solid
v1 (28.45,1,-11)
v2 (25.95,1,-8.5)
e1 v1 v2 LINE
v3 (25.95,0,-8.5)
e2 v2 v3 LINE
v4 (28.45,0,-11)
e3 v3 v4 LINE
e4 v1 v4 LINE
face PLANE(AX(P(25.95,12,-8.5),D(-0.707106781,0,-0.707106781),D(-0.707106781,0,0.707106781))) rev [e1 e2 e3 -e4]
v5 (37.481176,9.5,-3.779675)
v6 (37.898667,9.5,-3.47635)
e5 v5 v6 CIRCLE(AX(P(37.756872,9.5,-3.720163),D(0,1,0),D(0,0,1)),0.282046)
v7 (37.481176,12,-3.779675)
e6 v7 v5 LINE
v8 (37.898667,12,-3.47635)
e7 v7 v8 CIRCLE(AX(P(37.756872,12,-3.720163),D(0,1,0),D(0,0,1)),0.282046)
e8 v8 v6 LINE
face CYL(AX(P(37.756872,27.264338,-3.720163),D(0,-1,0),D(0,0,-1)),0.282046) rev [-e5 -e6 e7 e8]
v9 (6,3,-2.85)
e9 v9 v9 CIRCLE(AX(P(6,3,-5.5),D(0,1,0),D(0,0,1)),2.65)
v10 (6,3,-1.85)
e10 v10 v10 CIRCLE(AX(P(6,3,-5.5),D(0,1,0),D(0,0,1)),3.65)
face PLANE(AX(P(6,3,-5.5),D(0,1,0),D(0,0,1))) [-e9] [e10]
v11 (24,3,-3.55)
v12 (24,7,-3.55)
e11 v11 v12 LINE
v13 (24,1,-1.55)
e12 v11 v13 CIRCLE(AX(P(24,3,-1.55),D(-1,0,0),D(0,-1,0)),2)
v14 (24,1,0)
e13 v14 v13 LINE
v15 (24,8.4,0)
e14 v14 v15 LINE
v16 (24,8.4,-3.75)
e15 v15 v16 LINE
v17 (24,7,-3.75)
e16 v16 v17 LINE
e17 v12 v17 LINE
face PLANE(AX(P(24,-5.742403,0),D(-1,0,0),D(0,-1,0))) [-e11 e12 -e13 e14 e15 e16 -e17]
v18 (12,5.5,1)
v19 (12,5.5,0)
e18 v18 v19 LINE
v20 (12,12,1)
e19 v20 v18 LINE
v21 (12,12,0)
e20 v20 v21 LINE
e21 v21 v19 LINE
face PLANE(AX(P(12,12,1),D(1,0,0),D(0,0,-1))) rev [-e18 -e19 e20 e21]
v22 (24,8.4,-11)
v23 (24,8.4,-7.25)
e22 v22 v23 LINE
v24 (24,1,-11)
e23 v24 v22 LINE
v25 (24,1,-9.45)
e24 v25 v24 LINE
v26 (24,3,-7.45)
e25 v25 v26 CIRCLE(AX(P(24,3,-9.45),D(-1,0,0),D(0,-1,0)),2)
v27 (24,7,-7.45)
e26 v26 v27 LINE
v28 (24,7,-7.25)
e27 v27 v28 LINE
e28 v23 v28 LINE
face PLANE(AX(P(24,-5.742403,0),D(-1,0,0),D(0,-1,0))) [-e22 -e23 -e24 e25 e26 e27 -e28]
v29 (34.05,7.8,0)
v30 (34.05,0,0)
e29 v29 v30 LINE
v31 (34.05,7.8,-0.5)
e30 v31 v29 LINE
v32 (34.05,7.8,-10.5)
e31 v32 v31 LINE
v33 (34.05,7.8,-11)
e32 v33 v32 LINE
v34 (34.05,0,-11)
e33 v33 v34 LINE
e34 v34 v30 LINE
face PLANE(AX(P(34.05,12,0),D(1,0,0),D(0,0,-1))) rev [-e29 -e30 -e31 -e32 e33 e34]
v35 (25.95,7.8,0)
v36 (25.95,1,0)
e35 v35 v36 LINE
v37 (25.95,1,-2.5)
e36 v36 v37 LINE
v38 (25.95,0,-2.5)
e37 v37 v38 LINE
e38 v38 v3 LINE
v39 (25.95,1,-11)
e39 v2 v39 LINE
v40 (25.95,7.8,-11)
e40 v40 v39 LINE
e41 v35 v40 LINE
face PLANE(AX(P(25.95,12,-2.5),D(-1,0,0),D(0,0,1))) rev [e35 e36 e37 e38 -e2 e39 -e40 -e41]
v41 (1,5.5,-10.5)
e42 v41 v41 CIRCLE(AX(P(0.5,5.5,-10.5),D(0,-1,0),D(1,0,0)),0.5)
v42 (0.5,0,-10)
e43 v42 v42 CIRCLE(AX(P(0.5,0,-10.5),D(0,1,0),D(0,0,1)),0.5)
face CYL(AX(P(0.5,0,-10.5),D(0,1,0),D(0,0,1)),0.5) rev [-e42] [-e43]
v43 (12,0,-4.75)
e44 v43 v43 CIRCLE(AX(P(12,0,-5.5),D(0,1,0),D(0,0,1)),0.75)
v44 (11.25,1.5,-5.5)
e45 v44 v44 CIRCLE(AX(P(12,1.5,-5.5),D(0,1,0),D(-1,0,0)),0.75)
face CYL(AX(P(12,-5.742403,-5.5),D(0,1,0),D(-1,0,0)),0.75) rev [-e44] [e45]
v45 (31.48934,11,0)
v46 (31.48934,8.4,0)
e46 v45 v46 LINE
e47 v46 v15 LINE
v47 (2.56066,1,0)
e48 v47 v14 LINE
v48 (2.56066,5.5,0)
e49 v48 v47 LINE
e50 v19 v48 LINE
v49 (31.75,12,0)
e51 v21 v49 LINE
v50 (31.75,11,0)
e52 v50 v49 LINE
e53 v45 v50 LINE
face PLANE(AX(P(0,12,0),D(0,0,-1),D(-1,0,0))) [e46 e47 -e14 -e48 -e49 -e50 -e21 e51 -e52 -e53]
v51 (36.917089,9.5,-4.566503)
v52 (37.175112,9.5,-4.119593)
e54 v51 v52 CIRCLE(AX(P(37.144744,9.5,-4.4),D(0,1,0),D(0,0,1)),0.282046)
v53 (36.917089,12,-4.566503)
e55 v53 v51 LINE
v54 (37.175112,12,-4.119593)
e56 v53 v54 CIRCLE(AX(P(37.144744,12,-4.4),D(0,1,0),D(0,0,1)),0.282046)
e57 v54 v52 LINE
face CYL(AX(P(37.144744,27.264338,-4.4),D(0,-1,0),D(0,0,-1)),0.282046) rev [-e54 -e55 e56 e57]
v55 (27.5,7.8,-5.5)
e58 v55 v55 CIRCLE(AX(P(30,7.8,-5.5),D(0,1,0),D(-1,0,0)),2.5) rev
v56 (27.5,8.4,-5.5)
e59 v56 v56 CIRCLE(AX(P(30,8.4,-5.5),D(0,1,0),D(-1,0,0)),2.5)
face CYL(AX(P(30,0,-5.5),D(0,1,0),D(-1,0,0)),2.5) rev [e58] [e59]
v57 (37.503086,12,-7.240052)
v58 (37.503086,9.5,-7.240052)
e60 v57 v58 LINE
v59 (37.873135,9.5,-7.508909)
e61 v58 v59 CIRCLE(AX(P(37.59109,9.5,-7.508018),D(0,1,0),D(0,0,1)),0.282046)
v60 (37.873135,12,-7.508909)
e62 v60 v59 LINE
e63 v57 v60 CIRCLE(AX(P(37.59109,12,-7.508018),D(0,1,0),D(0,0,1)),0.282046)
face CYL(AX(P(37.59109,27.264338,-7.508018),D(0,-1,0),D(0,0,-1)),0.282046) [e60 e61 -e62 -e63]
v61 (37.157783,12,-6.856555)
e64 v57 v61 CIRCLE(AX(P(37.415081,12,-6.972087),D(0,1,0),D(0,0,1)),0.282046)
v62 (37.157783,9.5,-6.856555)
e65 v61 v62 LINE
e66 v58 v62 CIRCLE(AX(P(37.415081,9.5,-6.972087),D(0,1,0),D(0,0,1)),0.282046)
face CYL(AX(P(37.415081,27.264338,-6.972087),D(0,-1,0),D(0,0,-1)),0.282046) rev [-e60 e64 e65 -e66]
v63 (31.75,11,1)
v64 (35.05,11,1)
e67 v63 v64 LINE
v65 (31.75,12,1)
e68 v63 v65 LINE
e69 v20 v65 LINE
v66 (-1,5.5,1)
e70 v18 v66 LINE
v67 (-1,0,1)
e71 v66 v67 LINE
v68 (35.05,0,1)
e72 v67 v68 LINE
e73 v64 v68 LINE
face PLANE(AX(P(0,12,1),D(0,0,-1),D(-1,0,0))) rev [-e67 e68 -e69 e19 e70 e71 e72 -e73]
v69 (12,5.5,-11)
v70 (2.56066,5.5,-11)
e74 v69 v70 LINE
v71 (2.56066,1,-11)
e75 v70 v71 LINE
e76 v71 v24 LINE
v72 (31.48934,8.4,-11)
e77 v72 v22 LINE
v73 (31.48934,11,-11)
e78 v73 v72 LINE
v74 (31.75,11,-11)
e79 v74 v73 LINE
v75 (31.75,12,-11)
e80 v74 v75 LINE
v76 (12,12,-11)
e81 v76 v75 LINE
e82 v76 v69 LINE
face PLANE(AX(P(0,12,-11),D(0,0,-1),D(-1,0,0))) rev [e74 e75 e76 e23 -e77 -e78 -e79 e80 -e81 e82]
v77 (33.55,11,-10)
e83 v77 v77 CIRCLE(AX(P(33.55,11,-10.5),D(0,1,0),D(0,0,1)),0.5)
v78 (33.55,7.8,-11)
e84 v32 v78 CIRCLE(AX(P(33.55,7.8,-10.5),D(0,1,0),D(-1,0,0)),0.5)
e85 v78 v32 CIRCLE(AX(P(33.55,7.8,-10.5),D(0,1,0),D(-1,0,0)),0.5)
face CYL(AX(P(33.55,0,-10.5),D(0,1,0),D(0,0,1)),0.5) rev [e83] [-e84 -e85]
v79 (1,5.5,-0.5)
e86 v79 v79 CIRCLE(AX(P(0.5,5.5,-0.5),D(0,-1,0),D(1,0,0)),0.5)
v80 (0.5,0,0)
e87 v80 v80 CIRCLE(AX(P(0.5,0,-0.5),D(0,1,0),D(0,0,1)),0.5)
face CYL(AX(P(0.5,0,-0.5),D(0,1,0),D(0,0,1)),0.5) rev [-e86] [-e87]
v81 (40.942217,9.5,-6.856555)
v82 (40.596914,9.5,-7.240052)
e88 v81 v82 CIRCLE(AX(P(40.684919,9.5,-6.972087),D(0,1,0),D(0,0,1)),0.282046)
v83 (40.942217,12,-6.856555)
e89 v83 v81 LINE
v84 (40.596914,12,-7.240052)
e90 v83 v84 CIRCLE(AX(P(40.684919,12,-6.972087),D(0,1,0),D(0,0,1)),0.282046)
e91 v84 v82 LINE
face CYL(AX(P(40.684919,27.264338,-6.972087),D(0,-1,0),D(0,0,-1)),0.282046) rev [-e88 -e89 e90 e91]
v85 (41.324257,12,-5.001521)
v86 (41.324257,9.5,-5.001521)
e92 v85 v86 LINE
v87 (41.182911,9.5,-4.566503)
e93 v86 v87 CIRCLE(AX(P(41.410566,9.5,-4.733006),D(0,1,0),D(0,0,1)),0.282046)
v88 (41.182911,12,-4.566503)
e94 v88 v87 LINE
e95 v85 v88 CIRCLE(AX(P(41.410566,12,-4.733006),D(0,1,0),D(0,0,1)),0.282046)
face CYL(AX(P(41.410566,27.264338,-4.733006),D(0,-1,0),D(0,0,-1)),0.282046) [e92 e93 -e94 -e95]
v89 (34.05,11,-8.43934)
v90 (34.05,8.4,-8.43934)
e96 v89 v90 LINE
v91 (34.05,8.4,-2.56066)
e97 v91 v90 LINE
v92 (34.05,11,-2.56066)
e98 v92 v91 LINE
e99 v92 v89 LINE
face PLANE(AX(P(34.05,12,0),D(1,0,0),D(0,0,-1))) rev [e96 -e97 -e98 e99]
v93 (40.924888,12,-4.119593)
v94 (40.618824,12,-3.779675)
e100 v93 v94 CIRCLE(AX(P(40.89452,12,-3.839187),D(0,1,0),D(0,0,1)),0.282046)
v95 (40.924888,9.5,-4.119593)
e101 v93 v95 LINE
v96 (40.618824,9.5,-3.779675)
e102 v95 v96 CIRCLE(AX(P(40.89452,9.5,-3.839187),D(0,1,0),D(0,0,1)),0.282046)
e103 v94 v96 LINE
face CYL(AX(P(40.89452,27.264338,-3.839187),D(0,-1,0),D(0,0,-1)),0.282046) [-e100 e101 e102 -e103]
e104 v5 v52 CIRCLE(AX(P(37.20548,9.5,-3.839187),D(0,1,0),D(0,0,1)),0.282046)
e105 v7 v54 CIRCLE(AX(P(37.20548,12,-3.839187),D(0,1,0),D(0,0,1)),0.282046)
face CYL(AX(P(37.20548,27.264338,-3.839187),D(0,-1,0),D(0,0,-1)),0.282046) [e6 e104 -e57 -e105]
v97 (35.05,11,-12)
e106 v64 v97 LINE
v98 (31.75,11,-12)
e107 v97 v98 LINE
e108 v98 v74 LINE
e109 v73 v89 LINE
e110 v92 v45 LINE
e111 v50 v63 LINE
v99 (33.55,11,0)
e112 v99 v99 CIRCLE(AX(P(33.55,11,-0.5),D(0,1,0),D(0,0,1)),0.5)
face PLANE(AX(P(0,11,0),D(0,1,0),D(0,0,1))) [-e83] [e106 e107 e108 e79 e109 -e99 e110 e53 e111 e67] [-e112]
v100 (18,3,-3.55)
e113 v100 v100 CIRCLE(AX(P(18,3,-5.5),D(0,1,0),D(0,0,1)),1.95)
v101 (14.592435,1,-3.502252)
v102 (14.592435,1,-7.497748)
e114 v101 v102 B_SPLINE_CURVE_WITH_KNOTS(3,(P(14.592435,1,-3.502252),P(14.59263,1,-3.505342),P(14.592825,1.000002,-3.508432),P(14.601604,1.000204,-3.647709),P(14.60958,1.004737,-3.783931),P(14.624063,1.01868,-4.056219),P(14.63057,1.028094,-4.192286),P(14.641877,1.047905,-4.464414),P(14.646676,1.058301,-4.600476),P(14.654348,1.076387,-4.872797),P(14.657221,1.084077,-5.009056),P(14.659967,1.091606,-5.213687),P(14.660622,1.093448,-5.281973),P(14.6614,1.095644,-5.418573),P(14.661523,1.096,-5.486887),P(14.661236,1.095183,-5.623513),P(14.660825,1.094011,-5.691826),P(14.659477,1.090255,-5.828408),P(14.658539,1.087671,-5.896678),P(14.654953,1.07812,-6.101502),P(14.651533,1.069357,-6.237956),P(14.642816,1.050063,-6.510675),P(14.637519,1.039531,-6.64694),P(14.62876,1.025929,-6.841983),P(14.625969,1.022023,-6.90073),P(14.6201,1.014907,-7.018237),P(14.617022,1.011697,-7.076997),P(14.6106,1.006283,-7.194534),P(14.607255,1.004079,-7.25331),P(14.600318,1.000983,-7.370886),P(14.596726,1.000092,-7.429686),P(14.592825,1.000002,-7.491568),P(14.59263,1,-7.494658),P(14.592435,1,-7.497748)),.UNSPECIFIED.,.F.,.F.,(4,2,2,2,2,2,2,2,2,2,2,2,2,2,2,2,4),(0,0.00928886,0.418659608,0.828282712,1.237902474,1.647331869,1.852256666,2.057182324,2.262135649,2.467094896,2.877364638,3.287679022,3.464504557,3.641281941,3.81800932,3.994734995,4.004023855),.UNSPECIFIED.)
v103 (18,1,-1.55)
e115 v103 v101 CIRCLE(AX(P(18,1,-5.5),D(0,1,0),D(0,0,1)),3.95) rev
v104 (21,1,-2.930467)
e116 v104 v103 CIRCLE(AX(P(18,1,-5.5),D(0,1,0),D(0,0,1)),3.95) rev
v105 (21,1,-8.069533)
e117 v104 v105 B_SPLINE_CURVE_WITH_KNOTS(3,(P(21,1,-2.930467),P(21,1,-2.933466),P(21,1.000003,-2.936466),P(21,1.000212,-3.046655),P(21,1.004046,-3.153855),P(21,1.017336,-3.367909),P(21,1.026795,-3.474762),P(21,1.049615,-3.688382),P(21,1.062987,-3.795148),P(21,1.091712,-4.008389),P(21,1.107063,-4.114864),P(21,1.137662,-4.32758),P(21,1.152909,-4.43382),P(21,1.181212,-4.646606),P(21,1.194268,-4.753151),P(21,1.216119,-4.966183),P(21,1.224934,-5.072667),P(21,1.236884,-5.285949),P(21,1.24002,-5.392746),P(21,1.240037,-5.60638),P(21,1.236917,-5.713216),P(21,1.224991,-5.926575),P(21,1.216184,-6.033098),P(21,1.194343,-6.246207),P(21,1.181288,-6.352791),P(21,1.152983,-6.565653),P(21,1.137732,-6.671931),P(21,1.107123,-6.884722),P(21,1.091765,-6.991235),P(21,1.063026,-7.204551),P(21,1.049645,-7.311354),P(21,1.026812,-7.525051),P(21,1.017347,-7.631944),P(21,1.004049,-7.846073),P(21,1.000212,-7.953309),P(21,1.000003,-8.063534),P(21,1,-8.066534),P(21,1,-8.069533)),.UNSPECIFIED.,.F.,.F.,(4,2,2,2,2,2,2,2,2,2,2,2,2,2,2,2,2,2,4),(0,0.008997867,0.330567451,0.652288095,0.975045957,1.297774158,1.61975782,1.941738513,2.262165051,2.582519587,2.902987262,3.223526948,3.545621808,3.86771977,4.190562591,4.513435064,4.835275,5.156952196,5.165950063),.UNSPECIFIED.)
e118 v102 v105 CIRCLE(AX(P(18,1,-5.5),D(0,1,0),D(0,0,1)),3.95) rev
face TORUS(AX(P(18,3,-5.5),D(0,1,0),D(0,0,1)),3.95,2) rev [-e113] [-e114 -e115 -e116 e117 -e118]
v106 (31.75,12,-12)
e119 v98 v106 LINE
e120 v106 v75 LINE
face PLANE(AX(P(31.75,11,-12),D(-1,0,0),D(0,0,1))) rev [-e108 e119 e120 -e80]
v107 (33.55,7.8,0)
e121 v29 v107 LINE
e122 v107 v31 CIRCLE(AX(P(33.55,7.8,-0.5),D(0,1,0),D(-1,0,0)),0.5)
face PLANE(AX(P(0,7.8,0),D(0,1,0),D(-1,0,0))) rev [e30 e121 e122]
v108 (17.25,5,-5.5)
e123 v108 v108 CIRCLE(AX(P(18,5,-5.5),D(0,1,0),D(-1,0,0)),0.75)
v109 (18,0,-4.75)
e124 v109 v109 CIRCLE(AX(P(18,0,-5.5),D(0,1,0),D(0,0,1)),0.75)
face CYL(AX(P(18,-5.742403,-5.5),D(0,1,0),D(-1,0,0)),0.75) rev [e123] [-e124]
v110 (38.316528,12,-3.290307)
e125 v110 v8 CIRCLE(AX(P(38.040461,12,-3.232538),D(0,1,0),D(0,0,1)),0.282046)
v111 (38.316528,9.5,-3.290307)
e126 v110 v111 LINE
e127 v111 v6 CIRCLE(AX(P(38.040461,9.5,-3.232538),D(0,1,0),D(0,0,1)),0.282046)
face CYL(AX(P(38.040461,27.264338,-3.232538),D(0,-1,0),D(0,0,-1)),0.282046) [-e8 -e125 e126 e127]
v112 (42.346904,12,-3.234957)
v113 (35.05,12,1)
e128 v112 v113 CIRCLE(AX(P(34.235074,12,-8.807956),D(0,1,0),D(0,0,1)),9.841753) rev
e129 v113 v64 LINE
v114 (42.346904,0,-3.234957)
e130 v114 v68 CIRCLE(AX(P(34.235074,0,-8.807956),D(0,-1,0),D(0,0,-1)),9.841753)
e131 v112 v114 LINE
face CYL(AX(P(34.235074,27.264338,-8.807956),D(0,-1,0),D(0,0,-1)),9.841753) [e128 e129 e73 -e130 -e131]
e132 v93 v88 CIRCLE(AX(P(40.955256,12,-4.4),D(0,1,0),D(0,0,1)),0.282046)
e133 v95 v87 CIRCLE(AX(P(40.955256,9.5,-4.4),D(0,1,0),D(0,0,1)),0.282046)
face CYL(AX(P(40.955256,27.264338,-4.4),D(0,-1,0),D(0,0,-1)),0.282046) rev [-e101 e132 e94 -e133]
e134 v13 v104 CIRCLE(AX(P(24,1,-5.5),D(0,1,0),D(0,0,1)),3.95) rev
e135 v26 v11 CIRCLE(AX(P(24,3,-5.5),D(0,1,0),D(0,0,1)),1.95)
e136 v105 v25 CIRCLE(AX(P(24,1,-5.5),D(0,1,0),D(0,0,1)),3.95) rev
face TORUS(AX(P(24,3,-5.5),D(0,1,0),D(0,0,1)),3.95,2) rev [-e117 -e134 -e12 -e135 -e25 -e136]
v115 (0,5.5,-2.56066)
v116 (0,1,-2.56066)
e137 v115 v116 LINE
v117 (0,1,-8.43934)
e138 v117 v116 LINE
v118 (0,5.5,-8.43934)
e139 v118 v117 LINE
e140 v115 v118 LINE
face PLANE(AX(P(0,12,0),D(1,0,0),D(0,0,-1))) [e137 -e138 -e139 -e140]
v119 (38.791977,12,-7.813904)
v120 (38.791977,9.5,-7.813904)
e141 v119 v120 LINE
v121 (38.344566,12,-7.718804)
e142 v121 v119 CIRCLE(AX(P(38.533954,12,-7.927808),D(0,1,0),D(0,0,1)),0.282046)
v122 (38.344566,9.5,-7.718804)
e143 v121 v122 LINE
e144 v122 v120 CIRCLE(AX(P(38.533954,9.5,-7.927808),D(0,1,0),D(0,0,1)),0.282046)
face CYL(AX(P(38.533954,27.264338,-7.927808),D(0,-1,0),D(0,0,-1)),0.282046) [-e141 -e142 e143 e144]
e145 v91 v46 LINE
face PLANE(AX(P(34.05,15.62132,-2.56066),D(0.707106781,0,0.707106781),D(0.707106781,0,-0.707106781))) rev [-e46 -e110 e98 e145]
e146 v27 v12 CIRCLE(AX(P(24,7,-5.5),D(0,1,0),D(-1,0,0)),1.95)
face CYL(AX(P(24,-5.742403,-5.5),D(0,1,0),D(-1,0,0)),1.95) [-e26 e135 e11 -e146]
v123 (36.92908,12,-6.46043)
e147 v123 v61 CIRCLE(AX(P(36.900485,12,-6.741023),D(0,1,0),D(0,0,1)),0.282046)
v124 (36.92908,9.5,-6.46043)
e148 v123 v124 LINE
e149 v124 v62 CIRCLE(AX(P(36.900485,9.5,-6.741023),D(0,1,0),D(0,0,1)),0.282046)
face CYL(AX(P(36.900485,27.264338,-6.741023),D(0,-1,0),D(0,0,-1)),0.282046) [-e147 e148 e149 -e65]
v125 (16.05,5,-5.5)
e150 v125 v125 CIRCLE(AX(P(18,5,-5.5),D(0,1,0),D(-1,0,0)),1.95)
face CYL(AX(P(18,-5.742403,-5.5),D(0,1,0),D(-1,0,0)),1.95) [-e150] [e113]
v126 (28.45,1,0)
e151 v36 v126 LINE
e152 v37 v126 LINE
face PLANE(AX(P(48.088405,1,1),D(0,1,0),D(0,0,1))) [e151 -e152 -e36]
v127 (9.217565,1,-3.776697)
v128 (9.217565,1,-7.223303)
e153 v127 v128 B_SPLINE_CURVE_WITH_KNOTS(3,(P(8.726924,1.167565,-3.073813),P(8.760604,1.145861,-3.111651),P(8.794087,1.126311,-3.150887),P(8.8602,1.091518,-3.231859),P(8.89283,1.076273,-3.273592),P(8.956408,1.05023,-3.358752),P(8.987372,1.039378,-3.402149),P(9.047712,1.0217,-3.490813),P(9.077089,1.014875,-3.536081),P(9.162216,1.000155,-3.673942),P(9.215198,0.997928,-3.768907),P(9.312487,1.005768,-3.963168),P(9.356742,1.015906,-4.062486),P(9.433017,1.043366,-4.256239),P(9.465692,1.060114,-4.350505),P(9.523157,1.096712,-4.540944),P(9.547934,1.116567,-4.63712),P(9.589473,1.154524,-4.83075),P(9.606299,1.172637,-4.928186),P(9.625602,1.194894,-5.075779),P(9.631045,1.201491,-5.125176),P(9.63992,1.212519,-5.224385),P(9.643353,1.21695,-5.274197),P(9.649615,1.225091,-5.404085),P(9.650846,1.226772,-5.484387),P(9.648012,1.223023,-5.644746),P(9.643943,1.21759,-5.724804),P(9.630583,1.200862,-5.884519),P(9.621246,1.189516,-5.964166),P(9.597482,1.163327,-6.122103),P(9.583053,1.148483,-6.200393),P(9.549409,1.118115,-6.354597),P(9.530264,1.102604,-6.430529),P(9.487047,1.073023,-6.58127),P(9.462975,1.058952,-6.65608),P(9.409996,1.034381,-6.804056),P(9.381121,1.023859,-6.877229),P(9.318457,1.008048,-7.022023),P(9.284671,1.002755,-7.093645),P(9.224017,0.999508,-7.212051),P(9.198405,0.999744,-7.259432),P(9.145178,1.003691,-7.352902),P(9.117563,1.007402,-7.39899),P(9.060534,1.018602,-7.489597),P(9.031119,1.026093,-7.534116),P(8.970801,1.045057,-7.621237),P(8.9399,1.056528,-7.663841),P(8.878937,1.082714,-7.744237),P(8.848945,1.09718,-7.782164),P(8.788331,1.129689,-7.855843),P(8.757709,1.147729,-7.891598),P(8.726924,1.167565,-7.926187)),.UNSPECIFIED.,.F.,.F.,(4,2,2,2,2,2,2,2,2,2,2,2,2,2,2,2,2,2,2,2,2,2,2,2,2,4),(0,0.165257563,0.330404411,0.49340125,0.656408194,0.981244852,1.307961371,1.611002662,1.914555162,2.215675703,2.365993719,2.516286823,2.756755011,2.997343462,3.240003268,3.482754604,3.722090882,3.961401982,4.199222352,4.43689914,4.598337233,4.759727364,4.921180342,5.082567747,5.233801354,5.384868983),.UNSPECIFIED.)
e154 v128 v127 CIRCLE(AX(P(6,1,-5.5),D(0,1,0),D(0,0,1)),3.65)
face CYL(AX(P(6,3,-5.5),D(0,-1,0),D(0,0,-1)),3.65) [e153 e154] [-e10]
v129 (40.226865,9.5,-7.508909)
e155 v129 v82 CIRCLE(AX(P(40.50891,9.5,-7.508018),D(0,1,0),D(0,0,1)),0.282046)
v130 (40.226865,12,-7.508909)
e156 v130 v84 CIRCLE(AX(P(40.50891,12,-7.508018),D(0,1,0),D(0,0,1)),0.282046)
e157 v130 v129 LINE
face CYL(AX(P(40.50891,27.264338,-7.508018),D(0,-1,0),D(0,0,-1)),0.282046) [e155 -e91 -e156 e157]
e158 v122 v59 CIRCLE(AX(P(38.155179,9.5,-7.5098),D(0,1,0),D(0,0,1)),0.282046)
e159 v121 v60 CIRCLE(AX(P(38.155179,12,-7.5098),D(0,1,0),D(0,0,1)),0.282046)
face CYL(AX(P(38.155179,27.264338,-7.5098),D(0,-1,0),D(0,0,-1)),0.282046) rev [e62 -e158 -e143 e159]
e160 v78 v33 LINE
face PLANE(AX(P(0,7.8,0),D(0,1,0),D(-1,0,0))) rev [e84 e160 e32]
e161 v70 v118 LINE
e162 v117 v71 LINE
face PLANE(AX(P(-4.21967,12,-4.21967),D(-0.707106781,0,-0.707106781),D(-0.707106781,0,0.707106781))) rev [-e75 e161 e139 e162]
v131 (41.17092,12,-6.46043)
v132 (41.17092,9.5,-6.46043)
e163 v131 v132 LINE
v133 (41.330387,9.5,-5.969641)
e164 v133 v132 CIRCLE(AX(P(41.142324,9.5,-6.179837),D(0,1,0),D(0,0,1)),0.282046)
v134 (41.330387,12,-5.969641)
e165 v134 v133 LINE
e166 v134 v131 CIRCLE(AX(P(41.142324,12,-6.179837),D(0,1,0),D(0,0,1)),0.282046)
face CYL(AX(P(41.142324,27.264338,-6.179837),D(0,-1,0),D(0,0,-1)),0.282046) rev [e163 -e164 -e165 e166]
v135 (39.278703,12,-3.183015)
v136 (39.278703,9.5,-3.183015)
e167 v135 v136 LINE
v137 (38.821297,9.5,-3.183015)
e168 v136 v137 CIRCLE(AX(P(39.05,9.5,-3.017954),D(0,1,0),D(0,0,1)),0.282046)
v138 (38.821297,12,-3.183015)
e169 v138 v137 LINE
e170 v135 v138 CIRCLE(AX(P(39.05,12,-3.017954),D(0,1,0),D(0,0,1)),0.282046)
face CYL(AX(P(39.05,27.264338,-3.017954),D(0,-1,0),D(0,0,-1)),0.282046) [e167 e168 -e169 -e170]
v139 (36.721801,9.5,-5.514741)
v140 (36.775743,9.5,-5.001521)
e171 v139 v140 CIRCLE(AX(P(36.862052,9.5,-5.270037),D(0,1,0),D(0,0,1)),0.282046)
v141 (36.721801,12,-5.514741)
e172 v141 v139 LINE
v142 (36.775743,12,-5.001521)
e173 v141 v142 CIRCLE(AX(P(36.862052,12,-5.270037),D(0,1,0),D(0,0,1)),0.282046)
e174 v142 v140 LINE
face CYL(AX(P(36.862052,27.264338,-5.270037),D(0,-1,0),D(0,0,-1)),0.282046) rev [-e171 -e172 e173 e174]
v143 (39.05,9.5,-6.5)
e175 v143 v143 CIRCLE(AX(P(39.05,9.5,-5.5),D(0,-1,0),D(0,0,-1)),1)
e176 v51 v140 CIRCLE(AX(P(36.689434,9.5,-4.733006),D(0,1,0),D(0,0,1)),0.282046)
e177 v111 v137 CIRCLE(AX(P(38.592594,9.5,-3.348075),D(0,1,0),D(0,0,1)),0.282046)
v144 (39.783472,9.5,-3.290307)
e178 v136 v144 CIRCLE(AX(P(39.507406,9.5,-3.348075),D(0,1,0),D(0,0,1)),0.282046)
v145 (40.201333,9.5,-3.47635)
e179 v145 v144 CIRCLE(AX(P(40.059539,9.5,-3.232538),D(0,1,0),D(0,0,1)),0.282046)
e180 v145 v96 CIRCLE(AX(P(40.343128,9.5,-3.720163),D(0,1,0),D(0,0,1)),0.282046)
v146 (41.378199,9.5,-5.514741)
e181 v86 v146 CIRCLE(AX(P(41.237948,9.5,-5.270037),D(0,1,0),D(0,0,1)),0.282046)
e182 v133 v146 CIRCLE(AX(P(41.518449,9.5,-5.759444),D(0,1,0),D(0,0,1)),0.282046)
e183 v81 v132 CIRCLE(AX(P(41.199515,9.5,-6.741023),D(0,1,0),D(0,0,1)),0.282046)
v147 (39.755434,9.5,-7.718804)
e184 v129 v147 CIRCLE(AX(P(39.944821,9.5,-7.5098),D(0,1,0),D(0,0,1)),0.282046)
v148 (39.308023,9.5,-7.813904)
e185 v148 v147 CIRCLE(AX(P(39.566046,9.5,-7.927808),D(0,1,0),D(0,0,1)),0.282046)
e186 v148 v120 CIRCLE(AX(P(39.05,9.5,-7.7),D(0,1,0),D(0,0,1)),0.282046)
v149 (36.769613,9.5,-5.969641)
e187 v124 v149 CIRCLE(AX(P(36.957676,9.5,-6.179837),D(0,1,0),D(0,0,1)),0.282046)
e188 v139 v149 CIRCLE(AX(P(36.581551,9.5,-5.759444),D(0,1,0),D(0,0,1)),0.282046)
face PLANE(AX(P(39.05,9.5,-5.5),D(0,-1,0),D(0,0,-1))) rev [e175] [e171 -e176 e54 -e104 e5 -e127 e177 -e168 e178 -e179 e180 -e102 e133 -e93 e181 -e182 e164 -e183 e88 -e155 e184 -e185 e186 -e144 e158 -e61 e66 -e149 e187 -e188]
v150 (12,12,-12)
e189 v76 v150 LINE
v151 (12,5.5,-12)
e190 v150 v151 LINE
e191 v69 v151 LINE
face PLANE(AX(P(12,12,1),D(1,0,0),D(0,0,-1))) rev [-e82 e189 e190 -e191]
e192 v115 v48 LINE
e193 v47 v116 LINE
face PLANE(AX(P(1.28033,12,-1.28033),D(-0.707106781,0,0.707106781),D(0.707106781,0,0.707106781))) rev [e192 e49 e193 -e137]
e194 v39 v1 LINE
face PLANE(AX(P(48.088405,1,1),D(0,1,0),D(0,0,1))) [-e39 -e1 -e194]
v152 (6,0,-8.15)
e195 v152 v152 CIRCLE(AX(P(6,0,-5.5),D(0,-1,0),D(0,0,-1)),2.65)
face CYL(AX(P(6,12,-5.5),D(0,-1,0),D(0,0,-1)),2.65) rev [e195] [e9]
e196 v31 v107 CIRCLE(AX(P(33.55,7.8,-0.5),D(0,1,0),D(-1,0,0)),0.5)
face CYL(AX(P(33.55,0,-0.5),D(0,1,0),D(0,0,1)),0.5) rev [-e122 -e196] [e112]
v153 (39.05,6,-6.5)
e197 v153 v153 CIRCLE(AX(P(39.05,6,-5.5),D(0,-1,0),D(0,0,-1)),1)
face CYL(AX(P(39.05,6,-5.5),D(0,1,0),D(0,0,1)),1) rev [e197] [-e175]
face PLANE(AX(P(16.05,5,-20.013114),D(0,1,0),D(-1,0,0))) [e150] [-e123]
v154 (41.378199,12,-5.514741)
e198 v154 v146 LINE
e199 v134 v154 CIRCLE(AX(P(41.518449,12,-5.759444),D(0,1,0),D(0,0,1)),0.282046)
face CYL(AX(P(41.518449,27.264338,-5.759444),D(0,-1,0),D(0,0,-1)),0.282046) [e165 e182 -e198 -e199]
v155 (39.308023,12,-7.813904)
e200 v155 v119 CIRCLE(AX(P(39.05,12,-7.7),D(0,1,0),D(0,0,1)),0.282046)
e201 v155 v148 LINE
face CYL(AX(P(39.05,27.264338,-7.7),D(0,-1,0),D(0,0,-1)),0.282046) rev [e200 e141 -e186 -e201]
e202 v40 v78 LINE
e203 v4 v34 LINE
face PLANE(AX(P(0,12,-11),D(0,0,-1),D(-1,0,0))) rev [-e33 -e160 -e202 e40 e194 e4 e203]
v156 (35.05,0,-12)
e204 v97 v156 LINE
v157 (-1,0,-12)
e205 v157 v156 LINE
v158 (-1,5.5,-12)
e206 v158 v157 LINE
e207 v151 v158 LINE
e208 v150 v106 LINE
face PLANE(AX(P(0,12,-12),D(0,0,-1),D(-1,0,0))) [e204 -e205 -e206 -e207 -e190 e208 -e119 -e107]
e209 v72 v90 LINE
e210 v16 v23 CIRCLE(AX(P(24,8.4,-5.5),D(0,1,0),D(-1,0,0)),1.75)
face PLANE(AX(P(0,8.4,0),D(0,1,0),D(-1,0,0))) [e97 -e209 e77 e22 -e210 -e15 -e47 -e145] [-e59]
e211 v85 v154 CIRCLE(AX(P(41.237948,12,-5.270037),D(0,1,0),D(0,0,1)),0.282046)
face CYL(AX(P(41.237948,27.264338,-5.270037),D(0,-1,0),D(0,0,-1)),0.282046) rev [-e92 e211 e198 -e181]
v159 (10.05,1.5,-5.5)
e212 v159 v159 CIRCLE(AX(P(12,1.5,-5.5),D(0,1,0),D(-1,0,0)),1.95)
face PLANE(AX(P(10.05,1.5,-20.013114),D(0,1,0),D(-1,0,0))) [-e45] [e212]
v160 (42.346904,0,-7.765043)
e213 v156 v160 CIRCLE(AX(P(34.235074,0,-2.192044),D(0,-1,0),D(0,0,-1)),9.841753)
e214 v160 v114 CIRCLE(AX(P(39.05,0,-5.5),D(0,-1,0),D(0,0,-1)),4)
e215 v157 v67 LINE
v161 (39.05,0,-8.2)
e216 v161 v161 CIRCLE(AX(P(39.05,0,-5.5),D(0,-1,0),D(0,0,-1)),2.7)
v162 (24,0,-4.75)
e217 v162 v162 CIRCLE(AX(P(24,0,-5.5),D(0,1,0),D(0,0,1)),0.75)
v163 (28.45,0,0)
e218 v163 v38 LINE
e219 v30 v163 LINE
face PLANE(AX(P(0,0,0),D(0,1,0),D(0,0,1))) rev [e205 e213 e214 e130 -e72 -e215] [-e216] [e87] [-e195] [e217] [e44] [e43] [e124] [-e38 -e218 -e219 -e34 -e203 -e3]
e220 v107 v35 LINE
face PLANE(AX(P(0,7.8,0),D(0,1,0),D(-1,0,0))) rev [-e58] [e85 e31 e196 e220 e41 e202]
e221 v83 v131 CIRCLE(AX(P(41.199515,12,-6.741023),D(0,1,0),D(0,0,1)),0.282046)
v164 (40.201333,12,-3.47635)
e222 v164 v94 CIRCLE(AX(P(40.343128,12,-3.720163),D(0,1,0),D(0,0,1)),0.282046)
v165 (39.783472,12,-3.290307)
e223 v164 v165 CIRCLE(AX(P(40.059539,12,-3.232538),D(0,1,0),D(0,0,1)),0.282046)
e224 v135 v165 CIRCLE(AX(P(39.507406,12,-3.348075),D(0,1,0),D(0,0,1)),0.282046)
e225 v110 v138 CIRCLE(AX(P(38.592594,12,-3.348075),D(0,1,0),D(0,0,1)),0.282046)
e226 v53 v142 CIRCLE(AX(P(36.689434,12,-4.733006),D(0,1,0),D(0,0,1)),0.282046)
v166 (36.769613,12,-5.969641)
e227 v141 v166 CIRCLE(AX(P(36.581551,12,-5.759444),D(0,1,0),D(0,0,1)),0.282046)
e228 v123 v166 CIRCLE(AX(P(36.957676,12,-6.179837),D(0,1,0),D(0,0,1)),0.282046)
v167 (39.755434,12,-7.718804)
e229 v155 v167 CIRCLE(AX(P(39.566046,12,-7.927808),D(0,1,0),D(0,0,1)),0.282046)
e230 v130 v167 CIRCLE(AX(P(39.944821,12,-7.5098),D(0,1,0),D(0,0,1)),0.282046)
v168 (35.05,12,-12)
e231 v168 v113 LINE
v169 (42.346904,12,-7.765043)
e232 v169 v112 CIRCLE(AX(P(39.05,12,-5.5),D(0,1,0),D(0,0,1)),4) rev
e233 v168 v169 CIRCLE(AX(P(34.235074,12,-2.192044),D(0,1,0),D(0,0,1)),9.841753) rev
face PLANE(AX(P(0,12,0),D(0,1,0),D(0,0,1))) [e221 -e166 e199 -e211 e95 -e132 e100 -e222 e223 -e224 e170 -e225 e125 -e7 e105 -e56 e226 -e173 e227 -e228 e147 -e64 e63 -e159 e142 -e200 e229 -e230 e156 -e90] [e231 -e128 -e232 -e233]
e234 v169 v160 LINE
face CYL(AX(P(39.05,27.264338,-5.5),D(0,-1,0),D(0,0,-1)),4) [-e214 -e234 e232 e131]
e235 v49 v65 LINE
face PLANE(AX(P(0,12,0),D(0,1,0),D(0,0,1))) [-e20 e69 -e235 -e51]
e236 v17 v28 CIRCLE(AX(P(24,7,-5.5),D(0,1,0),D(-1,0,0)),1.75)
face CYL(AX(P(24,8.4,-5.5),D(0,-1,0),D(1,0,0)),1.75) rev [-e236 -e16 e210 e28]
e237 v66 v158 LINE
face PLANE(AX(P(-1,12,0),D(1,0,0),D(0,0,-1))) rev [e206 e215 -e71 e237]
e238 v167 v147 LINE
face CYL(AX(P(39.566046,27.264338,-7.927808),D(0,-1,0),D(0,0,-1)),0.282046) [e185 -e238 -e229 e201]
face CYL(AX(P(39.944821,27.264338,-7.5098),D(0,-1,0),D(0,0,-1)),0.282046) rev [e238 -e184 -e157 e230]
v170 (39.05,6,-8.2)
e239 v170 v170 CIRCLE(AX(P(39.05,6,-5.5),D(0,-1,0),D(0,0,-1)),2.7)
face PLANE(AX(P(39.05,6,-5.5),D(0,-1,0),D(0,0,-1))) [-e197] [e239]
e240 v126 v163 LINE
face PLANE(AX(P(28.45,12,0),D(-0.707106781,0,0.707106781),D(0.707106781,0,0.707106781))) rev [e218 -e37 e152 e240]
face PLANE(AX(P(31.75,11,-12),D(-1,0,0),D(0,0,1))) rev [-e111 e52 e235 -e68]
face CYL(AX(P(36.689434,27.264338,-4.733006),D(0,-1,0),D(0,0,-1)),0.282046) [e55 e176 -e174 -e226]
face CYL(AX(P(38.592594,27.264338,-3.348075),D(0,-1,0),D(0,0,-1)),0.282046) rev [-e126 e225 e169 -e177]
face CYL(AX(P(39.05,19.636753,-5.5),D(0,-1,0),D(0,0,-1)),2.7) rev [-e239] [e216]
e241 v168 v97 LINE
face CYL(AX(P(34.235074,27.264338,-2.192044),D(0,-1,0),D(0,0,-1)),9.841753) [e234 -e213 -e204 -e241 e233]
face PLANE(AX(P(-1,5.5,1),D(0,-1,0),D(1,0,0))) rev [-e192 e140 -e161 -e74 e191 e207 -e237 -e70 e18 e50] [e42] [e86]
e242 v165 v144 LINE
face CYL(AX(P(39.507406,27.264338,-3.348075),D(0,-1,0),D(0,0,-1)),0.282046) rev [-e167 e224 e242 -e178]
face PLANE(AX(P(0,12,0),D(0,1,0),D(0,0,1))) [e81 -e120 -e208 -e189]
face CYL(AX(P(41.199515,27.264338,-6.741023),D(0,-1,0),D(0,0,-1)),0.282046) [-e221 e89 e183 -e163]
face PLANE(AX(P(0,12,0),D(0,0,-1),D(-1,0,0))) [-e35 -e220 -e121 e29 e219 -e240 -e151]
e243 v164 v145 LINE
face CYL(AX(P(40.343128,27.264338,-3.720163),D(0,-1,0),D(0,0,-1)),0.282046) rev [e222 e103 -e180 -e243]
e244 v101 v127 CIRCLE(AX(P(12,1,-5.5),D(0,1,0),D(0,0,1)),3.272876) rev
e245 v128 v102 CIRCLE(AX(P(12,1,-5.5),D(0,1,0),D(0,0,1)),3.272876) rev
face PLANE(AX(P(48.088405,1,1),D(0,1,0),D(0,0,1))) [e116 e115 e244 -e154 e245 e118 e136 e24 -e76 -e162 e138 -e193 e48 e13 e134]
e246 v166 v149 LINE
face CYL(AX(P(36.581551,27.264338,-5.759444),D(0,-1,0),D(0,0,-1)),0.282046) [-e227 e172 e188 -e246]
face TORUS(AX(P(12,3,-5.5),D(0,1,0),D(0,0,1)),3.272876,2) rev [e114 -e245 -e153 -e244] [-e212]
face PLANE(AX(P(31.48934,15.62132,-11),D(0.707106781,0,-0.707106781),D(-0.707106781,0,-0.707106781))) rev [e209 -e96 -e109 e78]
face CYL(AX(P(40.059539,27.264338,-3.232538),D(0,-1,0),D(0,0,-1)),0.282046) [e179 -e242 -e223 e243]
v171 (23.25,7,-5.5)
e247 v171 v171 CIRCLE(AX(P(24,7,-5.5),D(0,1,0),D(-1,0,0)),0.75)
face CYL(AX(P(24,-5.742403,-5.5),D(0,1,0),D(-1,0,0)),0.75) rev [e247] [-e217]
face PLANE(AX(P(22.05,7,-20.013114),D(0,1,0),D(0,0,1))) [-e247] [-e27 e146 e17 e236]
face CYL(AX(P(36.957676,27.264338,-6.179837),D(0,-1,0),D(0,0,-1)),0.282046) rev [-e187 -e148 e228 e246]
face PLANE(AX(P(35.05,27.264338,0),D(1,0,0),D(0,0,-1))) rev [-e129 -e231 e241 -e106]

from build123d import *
from build123d.topology import SkipClean

# Parameters (mm, degrees)
ESQUISSE2_W                 = 36.05
ESQUISSE2_H                 = 13
ESQUISSE2_W_2               = 34.05
ESQUISSE2_H_2               = 11
BOSS_EXTRU_1_DEPTH          = 12
ESQUISSE3_W                 = 13
ESQUISSE3_H                 = 1
BOSS_EXTRU_2_DEPTH          = 36.05
ESQUISSE4_R                 = 2.65
ENL_V_MAT_EXTRU_1_DEPTH     = 12
ESQUISSE6_W                 = 3.9
ESQUISSE6_H                 = 1.5
ESQUISSE6_H_2               = 5
ESQUISSE6_H_3               = 7
BOSS_EXTRU_3_DEPTH          = 13
ENL_V_START                 = -6
ENL_V_MAT_EXTRU_2_OUTLINE_R = 0.75
ENL_V_MAT_EXTRU_2_DEPTH     = 6
ESQUISSE8_W                 = 13
ESQUISSE8_H                 = 6.5
ENL_V_MAT_EXTRU_3_DEPTH     = 40.261972696
ESQUISSE9_W                 = 8.1
ESQUISSE9_H                 = 11
BOSS_EXTRU_5_DEPTH          = 1.4
ESQUISSE11_R                = 2.5
ENL_V_MAT_EXTRU_4_DEPTH     = 38.987662471
CONG_2_R                    = 2
ESQUISSE10_W                = 8.1
ESQUISSE10_H                = 11
ENL_V_MAT_EXTRU_5_DEPTH     = 0.8
BOSS_EXTRU_6_DEPTH          = 2.6
ESQUISSE14_R                = 0.5
ENL_V_MAT_EXTRU_7_DEPTH     = 39.645860063
ESQUISSE15_R                = 0.75
ENL_V_MAT_EXTRU_8_DEPTH     = 38.702818197
ESQUISSE16_W                = 3.3
ESQUISSE16_H                = 13
ENL_V_MAT_EXTRU_9_DEPTH     = 1
ESQUISSE18_R                = 3.65
ESQUISSE18_R_2              = 2.65
BOSS_EXTRU_7_DEPTH          = 2
BOSS_EXTRU_8_REACH          = 40.942
ESQUISSE21_R                = 2.7
ENL_V_MAT_EXTRU_10_DEPTH    = 9.5
BOSS_EXTRU_9_START          = 3.5
ESQUISSE22_R                = 2.7
ESQUISSE22_R_2              = 1
BOSS_EXTRU_9_DEPTH          = 3.5


# Read off the part's stored shape, not the designer's step: Enlèv. mat.-Extru.2
with BuildPart() as part:
    # Esquisse2 → Boss.-Extru.1 (new body)
    # profile 1 of 3: a face of its own
    with BuildSketch(Plane(origin=(0, 0, 0), x_dir=(1, 0, 0), z_dir=(0, 1, 0))):
        with Locations((17.025, 5.5)):
            Rectangle(ESQUISSE2_W, ESQUISSE2_H)
        with Locations((17.025, 5.5)):
            Rectangle(ESQUISSE2_W_2, ESQUISSE2_H_2, mode=Mode.SUBTRACT)
    # profile 2 of 3: a face of its own
    with BuildSketch(Plane(origin=(0, 0, 0), x_dir=(1, 0, 0), z_dir=(0, 1, 0))):
        Polygon((0, 0), (2.560660172, 0), (0, 2.560660172), align=None)
    # profile 3 of 3: a face of its own
    with BuildSketch(Plane(origin=(0, 0, 0), x_dir=(1, 0, 0), z_dir=(0, 1, 0))):
        Polygon((0, 11), (0, 8.439339828), (2.560660172, 11), align=None)
    extrude(amount=BOSS_EXTRU_1_DEPTH)

    # Esquisse3 → Boss.-Extru.2 (add)
    with BuildSketch(Plane.ZY.offset(1)):
        with Locations((-5.5, 0.5)):
            Rectangle(ESQUISSE3_W, ESQUISSE3_H)
    extrude(amount=-BOSS_EXTRU_2_DEPTH)

    # Esquisse4 → Enlèv. mat.-Extru.1 (cut)
    with BuildSketch(Plane.XZ):
        with Locations(Location((6, -5.5, 0), (0, 0, 270))):
            Circle(ESQUISSE4_R)
        Polygon((34.05, 0), (28.45, 0), (25.95, -2.5), (25.95, -8.5), (28.45, -11), (34.05, -11), align=None)
    extrude(amount=-ENL_V_MAT_EXTRU_1_DEPTH, mode=Mode.SUBTRACT)

    # Esquisse6 → Boss.-Extru.3 (add)
    with BuildSketch(Plane.XY.offset(1)):
        with Locations((12, 0.75)):
            Rectangle(ESQUISSE6_W, ESQUISSE6_H)
        with Locations((18, 2.5)):
            Rectangle(ESQUISSE6_W, ESQUISSE6_H_2)
        with Locations((24, 3.5)):
            Rectangle(ESQUISSE6_W, ESQUISSE6_H_3)
    extrude(amount=-BOSS_EXTRU_3_DEPTH)

    # Enlèv. mat.-Extru.2 outline → Enlèv. mat.-Extru.2 (cut)
    with BuildSketch(Plane(origin=(0, 7, 0), x_dir=(1, 0, 0), z_dir=(0, 1, 0)).offset(ENL_V_START)):
        with BuildLine():
            Line((24, 7.45), (24, 11))
            Line((24, 11), (22.05, 11))
            Line((22.05, 11), (22.05, 5.5))
            ThreePointArc((22.05, 5.5), (22.621141777, 6.878858223), (24, 7.45))
        make_face()
        with BuildLine():
            Line((19.95, 5.5), (19.95, 11))
            Line((19.95, 11), (16.05, 11))
            Line((16.05, 11), (16.05, 5.5))
            ThreePointArc((16.05, 5.5), (18, 7.45), (19.95, 5.5))
        make_face()
        with BuildLine():
            ThreePointArc((24, 3.55), (22.621141777, 4.121141777), (22.05, 5.5))
            Line((22.05, 5.5), (22.05, 0))
            Line((22.05, 0), (24, 0))
            Line((24, 0), (24, 3.55))
        make_face()
        with BuildLine():
            Line((19.95, 0), (19.95, 5.5))
            ThreePointArc((19.95, 5.5), (18, 3.55), (16.05, 5.5))
            Line((16.05, 5.5), (16.05, 0))
            Line((16.05, 0), (19.95, 0))
        make_face()
        with BuildLine():
            Line((13.95, 5.5), (13.95, 11))
            Line((13.95, 11), (10.05, 11))
            Line((10.05, 11), (10.05, 5.5))
            ThreePointArc((10.05, 5.5), (12, 7.45), (13.95, 5.5))
        make_face()
        with BuildLine():
            Line((13.95, 0), (13.95, 5.5))
            ThreePointArc((13.95, 5.5), (12, 3.55), (10.05, 5.5))
            Line((10.05, 5.5), (10.05, 0))
            Line((10.05, 0), (13.95, 0))
        make_face()
        with Locations((24, 5.5)):
            Circle(ENL_V_MAT_EXTRU_2_OUTLINE_R)
        with Locations((18, 5.5)):
            Circle(ENL_V_MAT_EXTRU_2_OUTLINE_R)
        with Locations((12, 5.5)):
            Circle(ENL_V_MAT_EXTRU_2_OUTLINE_R)
    extrude(amount=ENL_V_MAT_EXTRU_2_DEPTH, mode=Mode.SUBTRACT)

    # Esquisse8 → Enlèv. mat.-Extru.3 (cut, through all)
    with BuildSketch(Plane(origin=(0, 0, -12), x_dir=(-1, 0, 0), z_dir=(0, 0, -1))):
        with Locations((-5.5, 8.75)):
            Rectangle(ESQUISSE8_W, ESQUISSE8_H)
    extrude(amount=-ENL_V_MAT_EXTRU_3_DEPTH, mode=Mode.SUBTRACT)

    # Esquisse9 → Boss.-Extru.5 (add)
    with BuildSketch(Plane(origin=(0, 7, 0), x_dir=(1, 0, 0), z_dir=(0, 1, 0))):
        with Locations((30, 5.5)):
            Rectangle(ESQUISSE9_W, ESQUISSE9_H)
        with BuildLine():
            Line((24, 0), (25.95, 0))
            Line((25.95, 0), (25.95, 11))
            Line((25.95, 11), (24, 11))
            Line((24, 11), (24, 7.45))
            Line((24, 7.45), (24, 7.25))
            ThreePointArc((24, 7.25), (25.237436867, 6.737436867), (25.75, 5.5))
            ThreePointArc((25.75, 5.5), (25.237436867, 4.262563133), (24, 3.75))
            Line((24, 3.75), (24, 3.55))
            Line((24, 3.55), (24, 0))
        make_face()
    extrude(amount=BOSS_EXTRU_5_DEPTH)

    # Esquisse11 → Enlèv. mat.-Extru.4 (cut, through all)
    with BuildSketch(Plane(origin=(0, 8.4, 0), x_dir=(1, 0, 0), z_dir=(0, 1, 0))):
        with Locations(Location((30, 5.5, 0), (0, 0, 180))):
            Circle(ESQUISSE11_R)
    extrude(amount=-ENL_V_MAT_EXTRU_4_DEPTH, mode=Mode.SUBTRACT)

    # Congé2
    # the kernel refuses this fillet: 2 mm, written as the material it adds along each edge
    with BuildSketch(Plane(origin=(12, 1, -5.5), x_dir=(-1, 0, 0), z_dir=(0, 0, 1))) as cong_2_piece_1:
        with BuildLine():
            CenterArc((3.272875656, -2), CONG_2_R, 90, 41.409622109)
            Line((1.95, -0.5), (1.95, 0))
            Line((1.95, 0), (3.272875656, 0))
        make_face()
    revolve(axis=Axis((12, 1, -5.5), (0, -1, 0)))
    with BuildSketch(Plane(origin=(18, 1, -5.5), x_dir=(-1, 0, 0), z_dir=(0, 0, 1))) as cong_2_piece_2:
        with BuildLine():
            CenterArc((1.95 + CONG_2_R, -CONG_2_R), CONG_2_R, 90, 90)
            Line((1.95, -CONG_2_R), (1.95, 0))
            Line((1.95, 0), (1.95 + CONG_2_R, 0))
        make_face()
    revolve(axis=Axis((18, 1, -5.5), (0, -1, 0)))
    with BuildSketch(Plane(origin=(24.000000001, 1, -5.500000001), x_dir=(-5.493679582300461e-10, 0, 1.0), z_dir=(1.0, 0, 5.493679582300461e-10))) as cong_2_piece_3:
        with BuildLine():
            CenterArc((1.950000001 + CONG_2_R, -CONG_2_R), CONG_2_R, 90, 90)
            Line((1.950000001, -CONG_2_R), (1.950000001, 0))
            Line((1.950000001, 0), (1.950000001 + CONG_2_R, 0))
        make_face()
    revolve(axis=Axis((24.000000001, 1, -5.500000001), (0, -1, 0)), revolution_arc=89.999999937)
    with BuildSketch(Plane(origin=(24.000000001, 1, -5.499999999), x_dir=(-1.0, 0, -5.49367047277821e-10), z_dir=(-5.49367047277821e-10, 0, 1.0))) as cong_2_piece_4:
        with BuildLine():
            CenterArc((1.950000001 + CONG_2_R, -CONG_2_R), CONG_2_R, 90, 90)
            Line((1.950000001, -CONG_2_R), (1.950000001, 0))
            Line((1.950000001, 0), (1.950000001 + CONG_2_R, 0))
        make_face()
    revolve(axis=Axis((24.000000001, 1, -5.499999999), (0, -1, 0)), revolution_arc=89.999999937)

    # Esquisse10 → Enlèv. mat.-Extru.5 (cut)
    with BuildSketch(Plane.XZ.offset(-7)):
        with Locations((30, -5.5)):
            Rectangle(ESQUISSE10_W, ESQUISSE10_H)
    extrude(amount=-ENL_V_MAT_EXTRU_5_DEPTH, mode=Mode.SUBTRACT)

    # Esquisse13 → Boss.-Extru.6 (add)
    with BuildSketch(Plane(origin=(0, 8.4, 0), x_dir=(1, 0, 0), z_dir=(0, 1, 0))):
        Polygon((34.05, 2.560660172), (31.489339828, 0), (34.05, 0), align=None)
        Polygon((31.489339828, 11), (34.05, 8.439339828), (34.05, 11), align=None)
    extrude(amount=BOSS_EXTRU_6_DEPTH)

    # Esquisse14 → Enlèv. mat.-Extru.7 (cut, through all)
    with BuildSketch(Plane(origin=(0, 11, 0), x_dir=(1, 0, 0), z_dir=(0, 1, 0))):
        with Locations(Location((33.55, 0.5, 0), (0, 0, 270))):
            Circle(ESQUISSE14_R)
        with Locations((33.55, 10.5)):
            Circle(ESQUISSE14_R)
        with Locations(Location((0.5, 0.5, 0), (0, 0, 270))):
            Circle(ESQUISSE14_R)
        with Locations(Location((0.5, 10.5, 0), (0, 0, 270))):
            Circle(ESQUISSE14_R)
    extrude(amount=-ENL_V_MAT_EXTRU_7_DEPTH, mode=Mode.SUBTRACT)

    # Esquisse15 → Enlèv. mat.-Extru.8 (cut, through all)
    with SkipClean():  # the faces are left unmerged after this step: merging them gives an invalid solid
        with BuildSketch(Plane(origin=(0, 7, 0), x_dir=(1, 0, 0), z_dir=(0, 1, 0))):
            with Locations(Location((24, 5.5, 0), (0, 0, 180))):
                Circle(ESQUISSE15_R)
            with Locations(Location((18, 5.5, 0), (0, 0, 180))):
                Circle(ESQUISSE15_R)
            with Locations(Location((12, 5.5, 0), (0, 0, 180))):
                Circle(ESQUISSE15_R)
        extrude(amount=-ENL_V_MAT_EXTRU_8_DEPTH, mode=Mode.SUBTRACT)
    add(part.part.scale(1), mode=Mode.REPLACE)  # the faces are merged on a copy

    # Esquisse16 → Enlèv. mat.-Extru.9 (cut)
    with BuildSketch(Plane(origin=(0, 12, 0), x_dir=(1, 0, 0), z_dir=(0, 1, 0))):
        with Locations((33.4, 5.5)):
            Rectangle(ESQUISSE16_W, ESQUISSE16_H)
    extrude(amount=-ENL_V_MAT_EXTRU_9_DEPTH, mode=Mode.SUBTRACT)

    # Esquisse18 → Boss.-Extru.7 (add)
    with BuildSketch(Plane(origin=(0, 1, 0), x_dir=(1, 0, 0), z_dir=(0, 1, 0))):
        with Locations(Location((6, 5.5, 0), (0, 0, 28.17315389))):
            Circle(ESQUISSE18_R)
        with Locations(Location((6, 5.5, 0), (0, 0, 90))):
            Circle(ESQUISSE18_R_2, mode=Mode.SUBTRACT)
    extrude(amount=BOSS_EXTRU_7_DEPTH)

    # Boss.-Extru.8: up to this face of the body (flat: up to its plane)
    boss_extru_8_end = Plane(part.part.faces().sort_by_distance((21.875, 12, 0.5))[0])
    # Esquisse20 → Boss.-Extru.8 (add, up to the picked face)
    with BuildSketch(Plane.XZ, mode=Mode.PRIVATE) as boss_extru_8_sk1:
        with BuildLine():
            ThreePointArc((42.346904346, -7.765043428), (43.05, -5.5), (42.346904346, -3.234956572))
            ThreePointArc((42.346904346, -3.234956572), (39.175262197, -0.295926263), (35.05, 1))
            Line((35.05, 1), (35.05, -12))
            ThreePointArc((35.05, -12), (39.175262197, -10.704073737), (42.346904346, -7.765043428))
        make_face()
        with BuildLine():
            ThreePointArc((38.316527577, -3.290306638), (38.155179385, -3.490199993), (37.89866666, -3.476350305))
            ThreePointArc((37.89866666, -3.476350305), (37.742556317, -3.438480009), (37.591089868, -3.49198247))
            ThreePointArc((37.591089868, -3.49198247), (37.493400297, -3.619502454), (37.48117634, -3.779674778))
            ThreePointArc((37.48117634, -3.779674778), (37.415081384, -4.027912666), (37.175112173, -4.119593472))
            ThreePointArc((37.175112173, -4.119593472), (37.017095041, -4.148493032), (36.900484966, -4.258976917))
            ThreePointArc((36.900484966, -4.258976917), (36.863108153, -4.415206147), (36.917088965, -4.566502777))
            ThreePointArc((36.917088965, -4.566502777), (36.957675664, -4.820162612), (36.775742825, -5.001521467))
            ThreePointArc((36.775742825, -5.001521467), (36.643141502, -5.092193887), (36.581550742, -5.240555528))
            ThreePointArc((36.581550742, -5.240555528), (36.610949476, -5.398480551), (36.721801286, -5.514740926))
            ThreePointArc((36.721801286, -5.514740926), (36.86205183, -5.729962619), (36.769613203, -5.96964093))
            ThreePointArc((36.769613203, -5.96964093), (36.685355662, -6.106408123), (36.689433819, -6.266994446))
            ThreePointArc((36.689433819, -6.266994446), (36.780524793, -6.399308591), (36.929080315, -6.460430236))
            ThreePointArc((36.929080315, -6.460430236), (37.144744112, -6.6), (37.157783175, -6.856555209))
            ThreePointArc((37.157783175, -6.856555209), (37.136438311, -7.015768887), (37.205480234, -7.160813057))
            ThreePointArc((37.205480234, -7.160813057), (37.342512991, -7.244638006), (37.503085626, -7.240052432))
            ThreePointArc((37.503085626, -7.240052432), (37.756872445, -7.279837388), (37.873134626, -7.508908768))
            ThreePointArc((37.873134626, -7.508908768), (37.91839316, -7.663039439), (38.040460874, -7.767462001))
            ThreePointArc((38.040460874, -7.767462001), (38.199741205, -7.788303659), (38.344566485, -7.718803755))
            ThreePointArc((38.344566485, -7.718803755), (38.59259428, -7.651924722), (38.791976792, -7.813903752))
            ThreePointArc((38.791976792, -7.813903752), (38.896013111, -7.936300822), (39.05, -7.982046167))
            ThreePointArc((39.05, -7.982046167), (39.203986889, -7.936300822), (39.308023208, -7.813903752))
            ThreePointArc((39.308023208, -7.813903752), (39.50740572, -7.651924722), (39.755433515, -7.718803755))
            ThreePointArc((39.755433515, -7.718803755), (39.900258795, -7.788303659), (40.059539126, -7.767462001))
            ThreePointArc((40.059539126, -7.767462001), (40.18160684, -7.663039439), (40.226865374, -7.508908768))
            ThreePointArc((40.226865374, -7.508908768), (40.343127555, -7.279837388), (40.596914374, -7.240052432))
            ThreePointArc((40.596914374, -7.240052432), (40.757487009, -7.244638006), (40.894519766, -7.160813057))
            ThreePointArc((40.894519766, -7.160813057), (40.963561689, -7.015768887), (40.942216825, -6.856555209))
            ThreePointArc((40.942216825, -6.856555209), (40.955255888, -6.6), (41.170919685, -6.460430236))
            ThreePointArc((41.170919685, -6.460430236), (41.319475207, -6.399308591), (41.410566181, -6.266994446))
            ThreePointArc((41.410566181, -6.266994446), (41.414644338, -6.106408123), (41.330386797, -5.96964093))
            ThreePointArc((41.330386797, -5.96964093), (41.23794817, -5.729962619), (41.378198714, -5.514740926))
            ThreePointArc((41.378198714, -5.514740926), (41.489050524, -5.398480551), (41.518449258, -5.240555528))
            ThreePointArc((41.518449258, -5.240555528), (41.456858498, -5.092193887), (41.324257175, -5.001521467))
            ThreePointArc((41.324257175, -5.001521467), (41.142324336, -4.820162612), (41.182911035, -4.566502777))
            ThreePointArc((41.182911035, -4.566502777), (41.236891847, -4.415206147), (41.199515034, -4.258976917))
            ThreePointArc((41.199515034, -4.258976917), (41.082904959, -4.148493032), (40.924887827, -4.119593472))
            ThreePointArc((40.924887827, -4.119593472), (40.684918616, -4.027912666), (40.61882366, -3.779674778))
            ThreePointArc((40.61882366, -3.779674778), (40.606599703, -3.619502454), (40.508910132, -3.49198247))
            ThreePointArc((40.508910132, -3.49198247), (40.357443683, -3.438480009), (40.20133334, -3.476350305))
            ThreePointArc((40.20133334, -3.476350305), (39.944820615, -3.490199993), (39.783472423, -3.290306638))
            ThreePointArc((39.783472423, -3.290306638), (39.707157329, -3.148953871), (39.566046415, -3.072192497))
            ThreePointArc((39.566046415, -3.072192497), (39.405913518, -3.084922522), (39.27870286, -3.183014556))
            ThreePointArc((39.27870286, -3.183014556), (39.05, -3.3), (38.82129714, -3.183014556))
            ThreePointArc((38.82129714, -3.183014556), (38.694086482, -3.084922522), (38.533953585, -3.072192497))
            ThreePointArc((38.533953585, -3.072192497), (38.392842671, -3.148953871), (38.316527577, -3.290306638))
        make_face(mode=Mode.SUBTRACT)
    boss_extru_8_tool1 = split(extrude(boss_extru_8_sk1.sketch, amount=-BOSS_EXTRU_8_REACH, mode=Mode.PRIVATE), bisect_by=boss_extru_8_end, keep=Keep.BOTH, mode=Mode.PRIVATE)
    add(boss_extru_8_tool1.solids().sort_by(Axis((42.897357, 0, -5.5), (0, 1, 0)))[0])

    # Esquisse21 → Enlèv. mat.-Extru.10 (cut)
    with BuildSketch(Plane.XZ):
        with Locations(Location((39.05, -5.5, 0), (0, 0, 270))):
            Circle(ESQUISSE21_R)
    extrude(amount=-ENL_V_MAT_EXTRU_10_DEPTH, mode=Mode.SUBTRACT)

    # Esquisse22 → Boss.-Extru.9 (add)
    with BuildSketch(Plane.XZ.offset(-9.5).offset(BOSS_EXTRU_9_START)):
        with Locations(Location((39.05, -5.5, 0), (0, 0, 270))):
            Circle(ESQUISSE22_R)
        with Locations(Location((39.05, -5.5, 0), (0, 0, 270))):
            Circle(ESQUISSE22_R_2, mode=Mode.SUBTRACT)
    extrude(amount=-BOSS_EXTRU_9_DEPTH)


solid = part.part
